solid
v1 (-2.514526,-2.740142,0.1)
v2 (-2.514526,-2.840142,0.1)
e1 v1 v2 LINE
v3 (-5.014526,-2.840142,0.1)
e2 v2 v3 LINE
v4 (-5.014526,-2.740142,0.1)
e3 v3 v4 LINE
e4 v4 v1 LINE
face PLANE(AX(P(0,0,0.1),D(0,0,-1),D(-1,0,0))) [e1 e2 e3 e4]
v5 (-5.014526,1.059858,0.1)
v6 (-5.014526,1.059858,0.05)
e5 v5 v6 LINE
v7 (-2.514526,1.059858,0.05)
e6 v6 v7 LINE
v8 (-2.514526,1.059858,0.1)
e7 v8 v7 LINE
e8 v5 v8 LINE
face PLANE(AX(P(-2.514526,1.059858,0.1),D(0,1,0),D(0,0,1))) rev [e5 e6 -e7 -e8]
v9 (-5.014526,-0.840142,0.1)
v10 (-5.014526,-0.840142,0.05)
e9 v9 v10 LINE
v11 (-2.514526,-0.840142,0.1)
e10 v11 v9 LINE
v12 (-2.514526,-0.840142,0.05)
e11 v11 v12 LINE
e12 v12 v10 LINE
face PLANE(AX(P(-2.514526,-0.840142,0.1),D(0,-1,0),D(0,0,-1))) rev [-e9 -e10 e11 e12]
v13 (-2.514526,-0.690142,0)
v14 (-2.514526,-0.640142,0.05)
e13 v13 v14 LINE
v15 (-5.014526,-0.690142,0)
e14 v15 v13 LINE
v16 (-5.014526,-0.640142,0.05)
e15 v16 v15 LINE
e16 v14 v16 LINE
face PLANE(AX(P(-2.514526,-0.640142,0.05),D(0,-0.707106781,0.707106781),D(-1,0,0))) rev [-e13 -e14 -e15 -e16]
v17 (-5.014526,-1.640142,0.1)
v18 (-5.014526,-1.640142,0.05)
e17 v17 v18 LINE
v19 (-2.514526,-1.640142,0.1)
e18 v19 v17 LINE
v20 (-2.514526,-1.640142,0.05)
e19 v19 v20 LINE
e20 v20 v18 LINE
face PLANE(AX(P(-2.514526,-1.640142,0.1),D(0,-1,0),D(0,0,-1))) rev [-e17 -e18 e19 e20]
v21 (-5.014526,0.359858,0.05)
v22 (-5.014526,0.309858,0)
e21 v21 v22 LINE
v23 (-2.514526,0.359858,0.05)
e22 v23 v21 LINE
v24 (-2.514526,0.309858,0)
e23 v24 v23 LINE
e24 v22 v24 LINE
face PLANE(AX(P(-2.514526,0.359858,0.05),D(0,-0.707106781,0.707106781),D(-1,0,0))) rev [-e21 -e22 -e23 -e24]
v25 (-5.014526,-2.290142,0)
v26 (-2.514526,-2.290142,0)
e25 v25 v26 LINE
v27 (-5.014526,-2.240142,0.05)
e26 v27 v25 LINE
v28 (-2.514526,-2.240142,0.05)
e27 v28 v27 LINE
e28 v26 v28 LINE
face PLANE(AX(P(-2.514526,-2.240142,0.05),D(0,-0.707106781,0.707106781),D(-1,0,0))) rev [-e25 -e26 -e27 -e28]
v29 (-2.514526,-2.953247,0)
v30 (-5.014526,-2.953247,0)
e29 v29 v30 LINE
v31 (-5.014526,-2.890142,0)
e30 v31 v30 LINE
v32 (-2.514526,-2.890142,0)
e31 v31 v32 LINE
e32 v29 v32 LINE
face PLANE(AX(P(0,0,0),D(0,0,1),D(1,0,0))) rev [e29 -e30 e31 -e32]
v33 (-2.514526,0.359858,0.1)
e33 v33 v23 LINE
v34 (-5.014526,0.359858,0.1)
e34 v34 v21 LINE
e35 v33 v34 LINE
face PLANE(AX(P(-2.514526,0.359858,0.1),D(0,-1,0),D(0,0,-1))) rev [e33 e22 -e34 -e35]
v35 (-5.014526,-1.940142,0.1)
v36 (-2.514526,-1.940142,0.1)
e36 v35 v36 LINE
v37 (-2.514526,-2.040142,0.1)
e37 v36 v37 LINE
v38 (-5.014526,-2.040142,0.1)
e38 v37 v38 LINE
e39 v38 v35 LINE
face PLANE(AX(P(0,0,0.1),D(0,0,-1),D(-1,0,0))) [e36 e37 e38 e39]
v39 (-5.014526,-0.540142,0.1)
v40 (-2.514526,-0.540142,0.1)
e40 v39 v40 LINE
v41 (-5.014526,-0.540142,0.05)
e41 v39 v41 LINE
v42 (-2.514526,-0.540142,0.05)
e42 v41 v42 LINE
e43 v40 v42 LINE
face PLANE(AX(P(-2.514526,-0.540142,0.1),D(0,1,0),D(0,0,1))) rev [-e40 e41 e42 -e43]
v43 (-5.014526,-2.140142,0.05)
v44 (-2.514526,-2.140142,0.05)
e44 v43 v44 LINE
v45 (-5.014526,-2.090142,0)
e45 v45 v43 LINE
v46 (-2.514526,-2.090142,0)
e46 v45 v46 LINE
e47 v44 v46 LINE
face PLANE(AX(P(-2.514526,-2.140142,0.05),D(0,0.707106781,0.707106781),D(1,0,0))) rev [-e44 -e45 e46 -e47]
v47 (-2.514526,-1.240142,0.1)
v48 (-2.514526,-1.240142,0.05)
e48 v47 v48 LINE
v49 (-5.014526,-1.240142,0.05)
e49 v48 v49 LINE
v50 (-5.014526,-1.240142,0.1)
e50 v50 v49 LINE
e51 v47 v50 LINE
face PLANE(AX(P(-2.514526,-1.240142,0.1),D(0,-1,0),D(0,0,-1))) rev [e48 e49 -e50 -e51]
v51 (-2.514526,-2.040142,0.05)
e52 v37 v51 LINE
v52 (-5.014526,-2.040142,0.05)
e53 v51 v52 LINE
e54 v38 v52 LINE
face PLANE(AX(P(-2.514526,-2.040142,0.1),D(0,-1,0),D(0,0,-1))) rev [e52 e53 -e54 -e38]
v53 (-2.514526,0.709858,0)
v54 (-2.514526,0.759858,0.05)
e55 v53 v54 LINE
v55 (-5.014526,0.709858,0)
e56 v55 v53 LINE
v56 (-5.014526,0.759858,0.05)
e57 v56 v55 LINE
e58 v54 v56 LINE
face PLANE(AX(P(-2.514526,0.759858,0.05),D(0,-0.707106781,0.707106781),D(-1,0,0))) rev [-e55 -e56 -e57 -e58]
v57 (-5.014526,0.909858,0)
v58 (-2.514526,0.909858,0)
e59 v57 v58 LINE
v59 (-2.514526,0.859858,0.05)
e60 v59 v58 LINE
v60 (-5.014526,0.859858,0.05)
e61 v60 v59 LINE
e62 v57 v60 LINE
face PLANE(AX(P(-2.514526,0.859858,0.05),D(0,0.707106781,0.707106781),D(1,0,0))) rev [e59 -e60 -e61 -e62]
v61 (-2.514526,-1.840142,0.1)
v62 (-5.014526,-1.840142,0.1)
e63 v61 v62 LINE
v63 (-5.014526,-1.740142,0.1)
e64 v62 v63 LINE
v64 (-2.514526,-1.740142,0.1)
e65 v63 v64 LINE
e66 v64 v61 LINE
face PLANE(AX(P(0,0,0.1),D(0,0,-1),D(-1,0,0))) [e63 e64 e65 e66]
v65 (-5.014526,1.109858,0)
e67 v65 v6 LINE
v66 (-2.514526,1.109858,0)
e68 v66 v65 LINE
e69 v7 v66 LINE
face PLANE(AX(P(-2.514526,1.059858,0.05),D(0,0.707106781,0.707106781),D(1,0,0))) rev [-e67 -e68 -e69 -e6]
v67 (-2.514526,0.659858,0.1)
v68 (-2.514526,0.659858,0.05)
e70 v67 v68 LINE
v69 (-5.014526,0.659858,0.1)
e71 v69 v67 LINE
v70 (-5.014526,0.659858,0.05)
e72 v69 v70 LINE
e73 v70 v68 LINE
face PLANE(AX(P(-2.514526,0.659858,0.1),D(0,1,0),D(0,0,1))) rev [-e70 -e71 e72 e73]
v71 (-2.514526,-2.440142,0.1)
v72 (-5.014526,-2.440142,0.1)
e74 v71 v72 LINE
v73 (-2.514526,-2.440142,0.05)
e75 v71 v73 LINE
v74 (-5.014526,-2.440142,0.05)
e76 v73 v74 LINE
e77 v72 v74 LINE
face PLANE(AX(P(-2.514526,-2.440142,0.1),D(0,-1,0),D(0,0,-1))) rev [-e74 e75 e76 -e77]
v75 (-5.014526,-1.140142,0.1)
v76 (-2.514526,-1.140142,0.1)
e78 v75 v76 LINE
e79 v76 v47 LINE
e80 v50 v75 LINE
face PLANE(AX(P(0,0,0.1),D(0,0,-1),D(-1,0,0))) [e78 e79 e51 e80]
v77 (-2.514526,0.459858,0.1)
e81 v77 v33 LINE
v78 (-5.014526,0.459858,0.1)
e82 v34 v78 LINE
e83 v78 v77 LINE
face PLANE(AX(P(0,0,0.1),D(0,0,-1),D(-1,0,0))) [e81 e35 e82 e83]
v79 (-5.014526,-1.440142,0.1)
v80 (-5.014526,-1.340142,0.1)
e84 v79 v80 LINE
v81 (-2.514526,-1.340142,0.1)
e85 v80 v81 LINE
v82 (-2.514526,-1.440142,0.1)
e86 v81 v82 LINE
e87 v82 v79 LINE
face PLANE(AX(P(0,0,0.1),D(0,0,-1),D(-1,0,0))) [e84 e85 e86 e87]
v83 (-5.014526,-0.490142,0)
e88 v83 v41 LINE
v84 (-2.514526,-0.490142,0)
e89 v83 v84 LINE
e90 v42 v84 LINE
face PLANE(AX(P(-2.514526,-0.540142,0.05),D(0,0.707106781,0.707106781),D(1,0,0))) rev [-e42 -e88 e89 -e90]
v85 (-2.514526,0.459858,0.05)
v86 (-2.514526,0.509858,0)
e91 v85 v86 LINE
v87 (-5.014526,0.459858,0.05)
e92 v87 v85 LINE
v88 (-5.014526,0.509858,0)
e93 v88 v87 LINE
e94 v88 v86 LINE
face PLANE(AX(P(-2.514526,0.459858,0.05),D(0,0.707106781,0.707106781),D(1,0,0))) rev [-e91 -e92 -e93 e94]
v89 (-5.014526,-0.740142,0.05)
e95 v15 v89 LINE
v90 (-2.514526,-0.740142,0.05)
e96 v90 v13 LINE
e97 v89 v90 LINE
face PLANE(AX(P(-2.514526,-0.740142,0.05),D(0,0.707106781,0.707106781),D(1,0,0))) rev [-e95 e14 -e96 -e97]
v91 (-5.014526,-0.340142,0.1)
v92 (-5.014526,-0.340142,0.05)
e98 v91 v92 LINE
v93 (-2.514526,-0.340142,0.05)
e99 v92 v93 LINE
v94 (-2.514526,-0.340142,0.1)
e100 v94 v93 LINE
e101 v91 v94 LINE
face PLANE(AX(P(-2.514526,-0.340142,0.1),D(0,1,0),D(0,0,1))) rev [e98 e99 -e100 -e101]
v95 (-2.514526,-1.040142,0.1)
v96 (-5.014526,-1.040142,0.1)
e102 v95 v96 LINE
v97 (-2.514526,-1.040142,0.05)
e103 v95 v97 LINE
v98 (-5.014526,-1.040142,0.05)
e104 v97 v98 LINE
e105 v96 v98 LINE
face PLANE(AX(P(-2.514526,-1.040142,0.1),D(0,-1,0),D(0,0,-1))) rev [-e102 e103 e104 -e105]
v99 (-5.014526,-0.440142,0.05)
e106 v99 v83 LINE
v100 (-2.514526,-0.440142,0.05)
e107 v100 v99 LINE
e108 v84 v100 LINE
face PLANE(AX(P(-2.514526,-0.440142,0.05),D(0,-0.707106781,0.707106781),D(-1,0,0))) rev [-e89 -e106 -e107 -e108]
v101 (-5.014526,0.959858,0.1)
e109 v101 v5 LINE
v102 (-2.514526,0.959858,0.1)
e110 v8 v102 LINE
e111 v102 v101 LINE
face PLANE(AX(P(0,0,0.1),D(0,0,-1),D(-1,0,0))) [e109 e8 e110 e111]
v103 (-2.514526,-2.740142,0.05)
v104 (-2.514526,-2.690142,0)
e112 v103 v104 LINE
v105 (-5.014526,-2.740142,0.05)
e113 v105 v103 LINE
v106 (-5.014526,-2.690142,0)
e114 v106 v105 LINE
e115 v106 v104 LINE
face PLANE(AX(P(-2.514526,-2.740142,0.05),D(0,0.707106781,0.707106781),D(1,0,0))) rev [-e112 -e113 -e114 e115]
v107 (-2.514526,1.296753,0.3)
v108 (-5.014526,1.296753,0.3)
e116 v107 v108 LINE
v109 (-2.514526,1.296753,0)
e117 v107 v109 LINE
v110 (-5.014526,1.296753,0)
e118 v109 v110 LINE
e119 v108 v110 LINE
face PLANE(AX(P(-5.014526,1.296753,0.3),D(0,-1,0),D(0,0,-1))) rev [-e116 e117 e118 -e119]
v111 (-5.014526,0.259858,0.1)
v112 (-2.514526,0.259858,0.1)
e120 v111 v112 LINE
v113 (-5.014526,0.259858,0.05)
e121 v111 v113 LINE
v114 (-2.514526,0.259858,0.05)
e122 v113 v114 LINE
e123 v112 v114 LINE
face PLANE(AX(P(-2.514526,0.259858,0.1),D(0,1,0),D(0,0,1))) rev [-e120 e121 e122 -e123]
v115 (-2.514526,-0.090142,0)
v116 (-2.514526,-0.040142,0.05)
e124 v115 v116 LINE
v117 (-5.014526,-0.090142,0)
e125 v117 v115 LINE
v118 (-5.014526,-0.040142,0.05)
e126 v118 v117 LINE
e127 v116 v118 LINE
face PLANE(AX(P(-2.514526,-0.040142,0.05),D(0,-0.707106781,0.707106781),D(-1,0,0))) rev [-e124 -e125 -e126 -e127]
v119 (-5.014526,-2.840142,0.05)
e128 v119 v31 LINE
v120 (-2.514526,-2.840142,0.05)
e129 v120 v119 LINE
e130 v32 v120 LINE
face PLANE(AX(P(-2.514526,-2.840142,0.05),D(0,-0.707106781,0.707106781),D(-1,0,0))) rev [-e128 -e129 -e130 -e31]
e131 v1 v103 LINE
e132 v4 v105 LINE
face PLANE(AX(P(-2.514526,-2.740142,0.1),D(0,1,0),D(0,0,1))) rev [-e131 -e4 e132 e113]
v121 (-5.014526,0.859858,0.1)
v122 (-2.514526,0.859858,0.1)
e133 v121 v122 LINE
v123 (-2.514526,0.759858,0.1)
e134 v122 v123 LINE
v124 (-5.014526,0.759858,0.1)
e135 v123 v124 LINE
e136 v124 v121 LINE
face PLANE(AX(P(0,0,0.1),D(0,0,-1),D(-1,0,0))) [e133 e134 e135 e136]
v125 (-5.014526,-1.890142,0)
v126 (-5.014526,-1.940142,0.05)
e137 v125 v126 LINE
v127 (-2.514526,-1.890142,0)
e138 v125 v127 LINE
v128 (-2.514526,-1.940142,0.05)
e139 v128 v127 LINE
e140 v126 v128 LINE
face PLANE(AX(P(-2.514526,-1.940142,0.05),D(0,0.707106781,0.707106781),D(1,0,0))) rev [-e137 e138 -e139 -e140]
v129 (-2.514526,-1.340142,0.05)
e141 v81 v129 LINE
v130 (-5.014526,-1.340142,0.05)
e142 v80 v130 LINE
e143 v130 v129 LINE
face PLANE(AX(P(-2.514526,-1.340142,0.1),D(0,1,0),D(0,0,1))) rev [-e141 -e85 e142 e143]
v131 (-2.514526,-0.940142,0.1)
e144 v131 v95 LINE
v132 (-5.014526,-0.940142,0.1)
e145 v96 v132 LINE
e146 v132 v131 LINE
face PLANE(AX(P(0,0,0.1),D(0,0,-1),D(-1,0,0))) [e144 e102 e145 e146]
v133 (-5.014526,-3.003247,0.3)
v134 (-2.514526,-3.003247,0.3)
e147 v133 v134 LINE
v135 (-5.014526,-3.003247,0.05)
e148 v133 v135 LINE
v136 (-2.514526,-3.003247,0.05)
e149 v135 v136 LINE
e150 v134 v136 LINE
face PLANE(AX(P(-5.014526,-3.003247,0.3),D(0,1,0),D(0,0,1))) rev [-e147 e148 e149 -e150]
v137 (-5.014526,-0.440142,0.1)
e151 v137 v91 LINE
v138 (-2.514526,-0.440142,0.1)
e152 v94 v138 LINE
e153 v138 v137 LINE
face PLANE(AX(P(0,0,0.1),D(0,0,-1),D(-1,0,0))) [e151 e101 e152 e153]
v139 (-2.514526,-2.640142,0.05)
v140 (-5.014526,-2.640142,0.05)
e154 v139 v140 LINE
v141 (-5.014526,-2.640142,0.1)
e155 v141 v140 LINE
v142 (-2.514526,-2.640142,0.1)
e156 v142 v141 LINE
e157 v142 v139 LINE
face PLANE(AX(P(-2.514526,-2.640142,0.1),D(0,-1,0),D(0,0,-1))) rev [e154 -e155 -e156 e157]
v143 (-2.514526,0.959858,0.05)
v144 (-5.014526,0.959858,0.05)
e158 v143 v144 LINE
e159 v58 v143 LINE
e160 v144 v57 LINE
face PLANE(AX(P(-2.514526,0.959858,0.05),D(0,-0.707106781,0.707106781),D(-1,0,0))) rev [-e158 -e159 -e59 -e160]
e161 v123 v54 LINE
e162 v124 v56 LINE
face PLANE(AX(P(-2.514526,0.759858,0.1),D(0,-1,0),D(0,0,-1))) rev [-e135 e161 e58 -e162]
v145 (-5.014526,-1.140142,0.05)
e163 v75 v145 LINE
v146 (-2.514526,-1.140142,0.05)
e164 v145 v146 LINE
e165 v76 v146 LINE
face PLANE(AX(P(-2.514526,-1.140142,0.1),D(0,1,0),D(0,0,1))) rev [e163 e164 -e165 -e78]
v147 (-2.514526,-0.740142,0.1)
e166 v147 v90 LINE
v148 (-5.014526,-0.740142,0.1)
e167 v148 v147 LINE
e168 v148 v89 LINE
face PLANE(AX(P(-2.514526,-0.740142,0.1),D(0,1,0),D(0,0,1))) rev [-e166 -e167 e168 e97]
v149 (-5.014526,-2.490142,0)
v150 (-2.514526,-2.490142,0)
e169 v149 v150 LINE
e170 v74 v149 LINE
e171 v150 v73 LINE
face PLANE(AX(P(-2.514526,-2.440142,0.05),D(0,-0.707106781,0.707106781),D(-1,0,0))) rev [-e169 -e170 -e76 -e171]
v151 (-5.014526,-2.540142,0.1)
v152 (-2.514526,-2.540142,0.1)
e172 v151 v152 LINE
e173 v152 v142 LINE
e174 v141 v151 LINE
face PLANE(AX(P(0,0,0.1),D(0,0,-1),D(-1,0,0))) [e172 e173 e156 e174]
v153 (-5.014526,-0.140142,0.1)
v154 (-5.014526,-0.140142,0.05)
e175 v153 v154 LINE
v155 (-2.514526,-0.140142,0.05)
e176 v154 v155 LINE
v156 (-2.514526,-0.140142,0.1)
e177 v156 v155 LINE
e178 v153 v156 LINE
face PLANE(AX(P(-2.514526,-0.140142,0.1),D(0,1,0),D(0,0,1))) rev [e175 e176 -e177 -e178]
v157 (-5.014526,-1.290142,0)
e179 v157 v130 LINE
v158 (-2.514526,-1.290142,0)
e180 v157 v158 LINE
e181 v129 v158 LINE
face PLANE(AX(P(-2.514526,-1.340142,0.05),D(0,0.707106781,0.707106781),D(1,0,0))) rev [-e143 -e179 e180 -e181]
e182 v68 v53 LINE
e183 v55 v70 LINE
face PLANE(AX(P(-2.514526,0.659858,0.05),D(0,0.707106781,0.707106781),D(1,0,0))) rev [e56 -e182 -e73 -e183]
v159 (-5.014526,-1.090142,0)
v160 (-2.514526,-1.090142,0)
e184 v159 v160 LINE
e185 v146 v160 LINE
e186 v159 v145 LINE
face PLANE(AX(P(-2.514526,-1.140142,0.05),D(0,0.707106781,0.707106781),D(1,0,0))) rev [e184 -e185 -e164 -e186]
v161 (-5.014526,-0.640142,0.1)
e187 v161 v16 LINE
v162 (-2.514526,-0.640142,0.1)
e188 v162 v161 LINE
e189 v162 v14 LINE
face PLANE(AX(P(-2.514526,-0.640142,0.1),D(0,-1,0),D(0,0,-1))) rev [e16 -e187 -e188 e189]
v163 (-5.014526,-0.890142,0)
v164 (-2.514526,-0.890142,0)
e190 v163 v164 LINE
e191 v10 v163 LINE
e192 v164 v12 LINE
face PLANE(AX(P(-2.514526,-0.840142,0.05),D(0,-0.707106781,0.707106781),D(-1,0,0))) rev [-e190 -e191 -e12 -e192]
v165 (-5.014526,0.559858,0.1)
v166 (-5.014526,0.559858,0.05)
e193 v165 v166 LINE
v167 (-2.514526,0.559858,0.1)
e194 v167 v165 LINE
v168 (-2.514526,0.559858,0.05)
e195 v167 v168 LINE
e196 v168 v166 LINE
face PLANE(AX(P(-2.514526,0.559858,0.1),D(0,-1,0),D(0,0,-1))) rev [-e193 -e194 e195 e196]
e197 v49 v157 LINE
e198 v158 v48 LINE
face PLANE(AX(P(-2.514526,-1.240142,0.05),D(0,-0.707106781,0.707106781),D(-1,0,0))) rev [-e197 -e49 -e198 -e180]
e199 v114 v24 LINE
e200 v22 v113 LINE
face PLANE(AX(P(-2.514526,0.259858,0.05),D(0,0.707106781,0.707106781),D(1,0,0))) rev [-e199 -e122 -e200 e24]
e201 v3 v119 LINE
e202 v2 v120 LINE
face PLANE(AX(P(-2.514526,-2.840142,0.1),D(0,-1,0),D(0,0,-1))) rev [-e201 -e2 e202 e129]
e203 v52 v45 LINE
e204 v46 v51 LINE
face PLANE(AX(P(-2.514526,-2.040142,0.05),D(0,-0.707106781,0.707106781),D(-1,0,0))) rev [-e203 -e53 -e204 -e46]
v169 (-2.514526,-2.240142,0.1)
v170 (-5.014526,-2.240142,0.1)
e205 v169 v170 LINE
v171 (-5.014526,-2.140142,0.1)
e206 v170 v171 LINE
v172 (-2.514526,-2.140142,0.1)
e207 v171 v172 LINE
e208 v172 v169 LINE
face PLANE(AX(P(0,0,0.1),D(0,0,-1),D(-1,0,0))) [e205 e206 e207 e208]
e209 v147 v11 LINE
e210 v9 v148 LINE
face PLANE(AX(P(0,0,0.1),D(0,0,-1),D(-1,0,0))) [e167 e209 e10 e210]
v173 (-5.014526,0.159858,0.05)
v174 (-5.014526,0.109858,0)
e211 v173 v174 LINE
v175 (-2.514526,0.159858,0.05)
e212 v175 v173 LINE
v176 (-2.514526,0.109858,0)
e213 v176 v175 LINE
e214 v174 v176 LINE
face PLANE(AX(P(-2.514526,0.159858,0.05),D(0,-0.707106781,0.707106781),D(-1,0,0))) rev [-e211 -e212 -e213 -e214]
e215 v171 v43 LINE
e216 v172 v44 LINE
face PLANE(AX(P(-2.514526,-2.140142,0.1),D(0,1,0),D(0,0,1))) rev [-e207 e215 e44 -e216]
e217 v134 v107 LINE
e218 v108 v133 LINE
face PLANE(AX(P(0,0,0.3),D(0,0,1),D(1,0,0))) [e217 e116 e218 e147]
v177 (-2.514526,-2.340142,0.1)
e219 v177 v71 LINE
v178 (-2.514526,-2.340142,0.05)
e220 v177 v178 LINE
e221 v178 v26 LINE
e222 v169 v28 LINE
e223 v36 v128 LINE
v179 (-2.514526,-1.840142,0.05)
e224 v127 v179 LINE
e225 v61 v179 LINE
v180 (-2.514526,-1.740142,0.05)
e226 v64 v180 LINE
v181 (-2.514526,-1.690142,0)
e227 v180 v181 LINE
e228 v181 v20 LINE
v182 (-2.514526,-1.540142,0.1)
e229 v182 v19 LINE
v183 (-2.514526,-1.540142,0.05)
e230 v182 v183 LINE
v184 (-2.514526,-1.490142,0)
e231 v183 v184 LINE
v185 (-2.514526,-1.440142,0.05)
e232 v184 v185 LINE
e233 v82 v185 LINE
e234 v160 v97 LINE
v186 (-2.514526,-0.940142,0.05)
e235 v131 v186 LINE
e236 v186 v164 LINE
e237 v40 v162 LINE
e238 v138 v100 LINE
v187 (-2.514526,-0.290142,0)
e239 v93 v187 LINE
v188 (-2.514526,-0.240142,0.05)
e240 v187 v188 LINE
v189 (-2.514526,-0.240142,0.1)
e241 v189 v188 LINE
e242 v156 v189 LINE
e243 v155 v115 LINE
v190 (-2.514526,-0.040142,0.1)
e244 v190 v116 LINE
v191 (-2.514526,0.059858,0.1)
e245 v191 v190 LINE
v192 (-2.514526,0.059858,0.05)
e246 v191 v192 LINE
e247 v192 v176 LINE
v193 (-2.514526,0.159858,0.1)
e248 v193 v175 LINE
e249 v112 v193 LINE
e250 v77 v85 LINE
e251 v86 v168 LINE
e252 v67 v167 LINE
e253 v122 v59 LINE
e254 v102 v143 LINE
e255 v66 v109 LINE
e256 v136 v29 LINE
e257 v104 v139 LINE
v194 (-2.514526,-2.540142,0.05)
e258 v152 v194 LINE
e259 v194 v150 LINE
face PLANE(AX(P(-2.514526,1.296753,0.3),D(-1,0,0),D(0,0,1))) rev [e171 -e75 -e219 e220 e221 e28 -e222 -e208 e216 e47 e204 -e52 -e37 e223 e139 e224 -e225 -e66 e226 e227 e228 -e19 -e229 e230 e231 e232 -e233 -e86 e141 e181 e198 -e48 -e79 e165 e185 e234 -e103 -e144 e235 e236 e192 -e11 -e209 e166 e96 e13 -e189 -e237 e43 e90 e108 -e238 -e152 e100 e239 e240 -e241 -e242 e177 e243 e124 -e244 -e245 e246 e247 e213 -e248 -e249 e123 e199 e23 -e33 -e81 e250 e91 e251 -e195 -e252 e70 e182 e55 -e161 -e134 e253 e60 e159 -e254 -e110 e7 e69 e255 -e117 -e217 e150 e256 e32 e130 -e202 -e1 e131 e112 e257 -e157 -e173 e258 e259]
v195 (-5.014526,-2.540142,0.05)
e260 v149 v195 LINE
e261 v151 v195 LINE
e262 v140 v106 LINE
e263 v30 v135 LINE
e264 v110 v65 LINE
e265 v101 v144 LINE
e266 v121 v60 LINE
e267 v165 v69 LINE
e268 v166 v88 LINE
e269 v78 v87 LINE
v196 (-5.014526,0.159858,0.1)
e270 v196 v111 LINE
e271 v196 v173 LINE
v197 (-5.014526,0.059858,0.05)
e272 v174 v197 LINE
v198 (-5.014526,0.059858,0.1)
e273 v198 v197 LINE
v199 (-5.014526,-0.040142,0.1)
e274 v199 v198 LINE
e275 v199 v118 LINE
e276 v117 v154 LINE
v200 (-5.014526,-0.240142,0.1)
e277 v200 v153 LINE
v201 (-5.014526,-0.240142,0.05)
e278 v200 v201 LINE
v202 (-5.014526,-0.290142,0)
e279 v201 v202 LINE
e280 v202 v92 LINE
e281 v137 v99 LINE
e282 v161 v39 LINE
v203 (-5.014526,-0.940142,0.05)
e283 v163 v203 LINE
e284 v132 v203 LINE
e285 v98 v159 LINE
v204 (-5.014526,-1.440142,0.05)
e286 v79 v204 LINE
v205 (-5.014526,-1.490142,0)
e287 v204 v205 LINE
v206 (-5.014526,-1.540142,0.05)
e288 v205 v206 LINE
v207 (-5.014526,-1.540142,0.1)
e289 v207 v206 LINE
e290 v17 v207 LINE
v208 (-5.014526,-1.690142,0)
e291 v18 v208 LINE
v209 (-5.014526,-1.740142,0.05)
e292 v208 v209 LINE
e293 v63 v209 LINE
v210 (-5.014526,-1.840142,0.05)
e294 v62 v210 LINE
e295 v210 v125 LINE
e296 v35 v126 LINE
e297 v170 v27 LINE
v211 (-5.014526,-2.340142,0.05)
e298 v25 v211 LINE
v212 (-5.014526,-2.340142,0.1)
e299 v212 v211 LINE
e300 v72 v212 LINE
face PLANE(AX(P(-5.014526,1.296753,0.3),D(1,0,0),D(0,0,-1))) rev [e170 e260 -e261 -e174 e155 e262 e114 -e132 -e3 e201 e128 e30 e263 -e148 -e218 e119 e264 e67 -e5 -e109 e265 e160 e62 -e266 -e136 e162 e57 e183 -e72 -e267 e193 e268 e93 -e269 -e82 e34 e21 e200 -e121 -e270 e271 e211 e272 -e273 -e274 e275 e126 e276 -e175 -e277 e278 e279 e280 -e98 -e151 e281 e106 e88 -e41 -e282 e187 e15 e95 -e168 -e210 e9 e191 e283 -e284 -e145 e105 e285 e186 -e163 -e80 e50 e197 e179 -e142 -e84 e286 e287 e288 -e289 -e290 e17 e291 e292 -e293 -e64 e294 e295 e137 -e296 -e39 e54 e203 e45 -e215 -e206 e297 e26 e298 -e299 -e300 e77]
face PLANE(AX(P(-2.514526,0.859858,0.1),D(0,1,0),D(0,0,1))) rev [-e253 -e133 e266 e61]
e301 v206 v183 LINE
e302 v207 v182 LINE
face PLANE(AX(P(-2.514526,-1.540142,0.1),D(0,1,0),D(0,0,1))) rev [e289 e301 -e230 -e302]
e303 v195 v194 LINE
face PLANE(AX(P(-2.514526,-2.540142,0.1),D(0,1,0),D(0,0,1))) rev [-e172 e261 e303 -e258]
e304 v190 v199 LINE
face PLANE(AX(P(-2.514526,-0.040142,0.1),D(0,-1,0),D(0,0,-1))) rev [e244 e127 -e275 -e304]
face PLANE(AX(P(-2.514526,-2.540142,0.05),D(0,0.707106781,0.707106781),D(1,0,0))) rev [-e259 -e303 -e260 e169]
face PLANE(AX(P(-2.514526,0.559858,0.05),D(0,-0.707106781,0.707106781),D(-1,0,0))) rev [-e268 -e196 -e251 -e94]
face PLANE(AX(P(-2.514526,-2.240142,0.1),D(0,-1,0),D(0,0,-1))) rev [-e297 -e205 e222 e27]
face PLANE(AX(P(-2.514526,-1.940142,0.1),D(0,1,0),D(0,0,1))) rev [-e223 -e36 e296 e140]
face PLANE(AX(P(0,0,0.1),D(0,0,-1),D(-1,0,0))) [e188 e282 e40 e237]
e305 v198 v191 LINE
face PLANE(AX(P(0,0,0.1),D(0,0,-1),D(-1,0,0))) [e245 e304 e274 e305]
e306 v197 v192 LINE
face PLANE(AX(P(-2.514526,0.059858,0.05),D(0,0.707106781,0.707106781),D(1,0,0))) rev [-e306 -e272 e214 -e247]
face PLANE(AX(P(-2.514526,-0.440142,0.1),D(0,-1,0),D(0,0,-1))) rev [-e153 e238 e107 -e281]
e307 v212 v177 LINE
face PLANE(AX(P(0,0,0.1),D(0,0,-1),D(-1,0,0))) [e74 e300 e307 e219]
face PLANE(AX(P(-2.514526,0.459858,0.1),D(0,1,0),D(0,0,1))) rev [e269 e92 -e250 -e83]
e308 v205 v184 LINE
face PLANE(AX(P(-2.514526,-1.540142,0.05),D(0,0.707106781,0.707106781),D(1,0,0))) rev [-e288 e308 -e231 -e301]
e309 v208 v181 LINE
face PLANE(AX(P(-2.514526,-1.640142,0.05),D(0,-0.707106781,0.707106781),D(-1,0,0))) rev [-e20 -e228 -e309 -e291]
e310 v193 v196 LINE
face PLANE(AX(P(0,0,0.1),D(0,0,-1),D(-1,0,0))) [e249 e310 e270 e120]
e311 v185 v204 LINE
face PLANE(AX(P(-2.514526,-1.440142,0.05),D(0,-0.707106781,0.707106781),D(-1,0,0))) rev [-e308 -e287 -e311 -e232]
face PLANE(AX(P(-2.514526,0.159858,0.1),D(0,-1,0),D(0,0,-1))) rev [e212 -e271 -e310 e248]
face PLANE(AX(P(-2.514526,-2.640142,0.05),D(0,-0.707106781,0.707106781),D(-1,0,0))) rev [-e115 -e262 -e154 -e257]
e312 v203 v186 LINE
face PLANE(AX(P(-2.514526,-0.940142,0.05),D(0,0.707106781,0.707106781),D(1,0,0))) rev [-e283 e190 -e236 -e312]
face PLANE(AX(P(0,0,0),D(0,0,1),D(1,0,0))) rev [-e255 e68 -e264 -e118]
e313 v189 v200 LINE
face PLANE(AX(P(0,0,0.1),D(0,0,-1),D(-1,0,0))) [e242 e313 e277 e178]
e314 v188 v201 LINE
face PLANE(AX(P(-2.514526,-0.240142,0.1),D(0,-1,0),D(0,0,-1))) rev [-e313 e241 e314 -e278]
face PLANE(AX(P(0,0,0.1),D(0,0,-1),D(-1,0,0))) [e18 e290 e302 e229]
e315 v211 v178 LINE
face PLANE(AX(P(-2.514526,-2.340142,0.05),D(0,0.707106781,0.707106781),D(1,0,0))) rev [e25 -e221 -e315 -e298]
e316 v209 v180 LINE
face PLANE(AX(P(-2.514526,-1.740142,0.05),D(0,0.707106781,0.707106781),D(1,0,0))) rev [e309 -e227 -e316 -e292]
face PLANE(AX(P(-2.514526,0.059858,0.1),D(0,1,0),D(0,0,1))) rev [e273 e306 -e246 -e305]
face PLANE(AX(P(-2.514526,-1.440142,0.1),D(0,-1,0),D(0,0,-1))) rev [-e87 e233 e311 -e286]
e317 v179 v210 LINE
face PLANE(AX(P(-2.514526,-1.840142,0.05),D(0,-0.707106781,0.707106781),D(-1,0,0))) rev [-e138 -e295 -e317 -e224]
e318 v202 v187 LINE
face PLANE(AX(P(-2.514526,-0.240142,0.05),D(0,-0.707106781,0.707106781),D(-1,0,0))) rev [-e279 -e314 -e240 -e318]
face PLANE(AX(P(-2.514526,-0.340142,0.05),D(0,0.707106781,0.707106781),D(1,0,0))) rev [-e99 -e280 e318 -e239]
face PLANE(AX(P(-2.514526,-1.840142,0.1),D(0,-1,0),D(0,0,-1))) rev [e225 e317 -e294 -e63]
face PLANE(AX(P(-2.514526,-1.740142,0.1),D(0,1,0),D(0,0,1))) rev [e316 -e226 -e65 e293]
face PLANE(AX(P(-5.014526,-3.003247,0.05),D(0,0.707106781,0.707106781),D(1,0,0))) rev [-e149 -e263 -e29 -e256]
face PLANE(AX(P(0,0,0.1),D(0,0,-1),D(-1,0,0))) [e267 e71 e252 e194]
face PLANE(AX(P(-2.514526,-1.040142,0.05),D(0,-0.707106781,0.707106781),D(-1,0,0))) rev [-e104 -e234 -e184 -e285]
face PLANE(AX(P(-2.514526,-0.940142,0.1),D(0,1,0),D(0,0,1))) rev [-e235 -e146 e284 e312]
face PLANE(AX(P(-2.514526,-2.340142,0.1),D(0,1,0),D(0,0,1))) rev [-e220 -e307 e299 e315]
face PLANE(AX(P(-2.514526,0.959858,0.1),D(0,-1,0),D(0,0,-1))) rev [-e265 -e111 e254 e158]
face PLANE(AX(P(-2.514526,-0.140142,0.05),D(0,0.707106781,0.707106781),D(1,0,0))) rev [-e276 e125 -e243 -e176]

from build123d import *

# Parameters (mm, degrees)
ESBO_O1_W                = 2.5
ESBO_O1_H                = 4.3
RESSALTO_EXTRUS_O1_DEPTH = 0.3
ESBO_O2_W                = 2.5
ESBO_O2_H                = 0.1
CORTE_EXTRUS_O1_DEPTH    = 0.1
CHANFRO1_SIZE            = 0.05


with BuildPart() as part:
    # Esboço1 → Ressalto-extrusão1 (new body)
    with BuildSketch(Plane.XY):
        with Locations((-3.764526375, -0.853246753)):
            Rectangle(ESBO_O1_W, ESBO_O1_H)
    extrude(amount=RESSALTO_EXTRUS_O1_DEPTH)

    # Esboço2 → Corte-extrusão1 (cut)
    with BuildSketch(Plane(origin=(0, 0, 0), x_dir=(-1, 0, 0), z_dir=(0, 0, -1))):
        with Locations((3.764526375, 0.809857643)):
            Rectangle(ESBO_O2_W, ESBO_O2_H)
        with Locations((3.764526375, 1.009857643)):
            Rectangle(ESBO_O2_W, ESBO_O2_H)
        with Locations((3.764526375, 0.609857643)):
            Rectangle(ESBO_O2_W, ESBO_O2_H)
        with Locations((3.764526375, 0.409857643)):
            Rectangle(ESBO_O2_W, ESBO_O2_H)
        with Locations((3.764526375, 0.209857643)):
            Rectangle(ESBO_O2_W, ESBO_O2_H)
        with Locations((3.764526375, 0.009857643)):
            Rectangle(ESBO_O2_W, ESBO_O2_H)
        with Locations((3.764526375, -0.190142357)):
            Rectangle(ESBO_O2_W, ESBO_O2_H)
        with Locations((3.764526375, -0.390142357)):
            Rectangle(ESBO_O2_W, ESBO_O2_H)
        with Locations((3.764526375, -0.590142357)):
            Rectangle(ESBO_O2_W, ESBO_O2_H)
        with Locations((3.764526375, -0.790142357)):
            Rectangle(ESBO_O2_W, ESBO_O2_H)
        with Locations((3.764526375, -0.990142357)):
            Rectangle(ESBO_O2_W, ESBO_O2_H)
        with Locations((3.764526375, -1.190142357)):
            Rectangle(ESBO_O2_W, ESBO_O2_H)
        with Locations((3.764526375, -1.390142357)):
            Rectangle(ESBO_O2_W, ESBO_O2_H)
        with Locations((3.764526375, -1.590142357)):
            Rectangle(ESBO_O2_W, ESBO_O2_H)
        with Locations((3.764526375, -1.790142357)):
            Rectangle(ESBO_O2_W, ESBO_O2_H)
        with Locations((3.764526375, -1.990142357)):
            Rectangle(ESBO_O2_W, ESBO_O2_H)
        with Locations((3.764526375, -2.190142357)):
            Rectangle(ESBO_O2_W, ESBO_O2_H)
        with Locations((3.764526375, -2.390142357)):
            Rectangle(ESBO_O2_W, ESBO_O2_H)
        with Locations((3.764526375, -2.590142357)):
            Rectangle(ESBO_O2_W, ESBO_O2_H)
        with Locations((3.764526375, -2.790142357)):
            Rectangle(ESBO_O2_W, ESBO_O2_H)
    extrude(amount=-CORTE_EXTRUS_O1_DEPTH, mode=Mode.SUBTRACT)

    # Chanfro1
    # the kernel refuses this chamfer: 0.05 mm, written as the material it takes off along each edge
    with BuildSketch(Plane(origin=(-5.143110525, -0.240142357, 0), x_dir=(0, -0.9996219169112968, -0.027495876610586355), z_dir=(1, 0, 0)), Plane(origin=(-5.143110525, -0.440142357, 0), x_dir=(0, -0.9996219169112968, -0.027495876610586386), z_dir=(1, 0, 0)), Plane(origin=(-5.143110525, -0.640142357, 0), x_dir=(0, -0.9996219169112968, -0.027495876610586313), z_dir=(1, 0, 0)), Plane(origin=(-5.143110525, -0.840142357, 0), x_dir=(0, -0.9996219169112968, -0.027495876610586313), z_dir=(1, 0, 0)), Plane(origin=(-5.143110525, -1.040142357, 0), x_dir=(0, -0.9996219169112968, -0.027495876610586313), z_dir=(1, 0, 0)), Plane(origin=(-5.143110525, -1.240142357, 0), x_dir=(0, -0.9996219169112968, -0.027495876610586313), z_dir=(1, 0, 0)), Plane(origin=(-5.143110525, -1.440142357, 0), x_dir=(0, -0.9996219169112968, -0.027495876610586313), z_dir=(1, 0, 0)), Plane(origin=(-5.143110525, -1.640142357, 0), x_dir=(0, -0.9996219169112968, -0.027495876610586313), z_dir=(1, 0, 0)), Plane(origin=(-5.143110525, 0.959857643, 0), x_dir=(0, -0.9996219169112968, -0.027495876610586344), z_dir=(1, 0, 0)), Plane(origin=(-2.385942226, 1.059857643, 0), x_dir=(0, 0.9996219169112968, -0.027495876610586313), z_dir=(-1, 0, 0)), Plane(origin=(-5.143110525, -1.840142357, 0), x_dir=(0, -0.9996219169112968, -0.027495876610586313), z_dir=(1, 0, 0)), Plane(origin=(-5.143110525, -2.040142357, 0), x_dir=(0, -0.9996219169112966, -0.027495876610586487), z_dir=(1, 0, 0)), Plane(origin=(-5.143110525, -2.240142357, 0), x_dir=(0, -0.9996219169112966, -0.027495876610586487), z_dir=(1, 0, 0)), Plane(origin=(-5.143110525, -2.440142357, 0), x_dir=(0, -0.9996219169112966, -0.027495876610586487), z_dir=(1, 0, 0)), Plane(origin=(-5.143110525, -2.640142357, 0), x_dir=(0, -0.9996219169112966, -0.027495876610586487), z_dir=(1, 0, 0)), Plane(origin=(-5.143110525, -2.840142357, 0), x_dir=(0, -0.9996219169112966, -0.027495876610586487), z_dir=(1, 0, 0)), Plane(origin=(-5.143110525, 0.759857643, 0), x_dir=(0, -0.9996219169112968, -0.02749587661058628), z_dir=(1, 0, 0)), Plane(origin=(-5.143110525, 0.559857643, 0), x_dir=(0, -0.9996219169112968, -0.027495876610586313), z_dir=(1, 0, 0)), Plane(origin=(-2.385942226, -3.003246753, 0), x_dir=(0, 0.9996219169112966, -0.027495876610586487), z_dir=(-1, 0, 0)), Plane(origin=(-5.143110525, 0.359857643, 0), x_dir=(0, -0.9996219169112968, -0.027495876610586355), z_dir=(1, 0, 0)), Plane(origin=(-5.143110525, 0.159857643, 0), x_dir=(0, -0.9996219169112968, -0.027495876610586303), z_dir=(1, 0, 0)), Plane(origin=(-5.143110525, -0.040142357, 0), x_dir=(0, -0.9996219169112968, -0.02749587661058635), z_dir=(1, 0, 0))) as chanfro1_piece_1:
        Polygon((CHANFRO1_SIZE * 0.999621916911, -CHANFRO1_SIZE * 0.0274958766106), (-CHANFRO1_SIZE * 0.0274958766106, -CHANFRO1_SIZE * 0.999621916911), (0, 0), align=None)
    extrude(amount=2.757168299, mode=Mode.SUBTRACT)
    with BuildSketch(Plane(origin=(-2.385942226, -0.140142357, 0), x_dir=(0, -0.027495876610586275, 0.9996219169112968), z_dir=(-1, 0, 0)), Plane(origin=(-2.385942226, -0.340142357, 0), x_dir=(0, -0.027495876610586275, 0.9996219169112968), z_dir=(-1, 0, 0)), Plane(origin=(-2.385942226, -0.540142357, 0), x_dir=(0, -0.02749587661058735, 0.9996219169112966), z_dir=(-1, 0, 0)), Plane(origin=(-2.385942226, -0.740142357, 0), x_dir=(0, -0.02749587661058735, 0.9996219169112966), z_dir=(-1, 0, 0)), Plane(origin=(-2.385942226, -0.940142357, 0), x_dir=(0, -0.02749587661058735, 0.9996219169112966), z_dir=(-1, 0, 0)), Plane(origin=(-2.385942226, -1.140142357, 0), x_dir=(0, -0.02749587661058735, 0.9996219169112966), z_dir=(-1, 0, 0)), Plane(origin=(-2.385942226, -1.340142357, 0), x_dir=(0, -0.02749587661058735, 0.9996219169112966), z_dir=(-1, 0, 0)), Plane(origin=(-2.385942226, -1.540142357, 0), x_dir=(0, -0.02749587661058735, 0.9996219169112966), z_dir=(-1, 0, 0)), Plane(origin=(-2.385942226, -1.740142357, 0), x_dir=(0, -0.02749587661058735, 0.9996219169112966), z_dir=(-1, 0, 0)), Plane(origin=(-2.385942226, -1.940142357, 0), x_dir=(0, -0.02749587661058735, 0.9996219169112966), z_dir=(-1, 0, 0)), Plane(origin=(-2.385942226, -2.140142357, 0), x_dir=(0, -0.02749587661058735, 0.9996219169112966), z_dir=(-1, 0, 0)), Plane(origin=(-2.385942226, -2.340142357, 0), x_dir=(0, -0.02749587661058735, 0.9996219169112966), z_dir=(-1, 0, 0)), Plane(origin=(-2.385942226, -2.540142357, 0), x_dir=(0, -0.02749587661058735, 0.9996219169112966), z_dir=(-1, 0, 0)), Plane(origin=(-2.385942226, -2.740142357, 0), x_dir=(0, -0.02749587661058735, 0.9996219169112966), z_dir=(-1, 0, 0)), Plane(origin=(-2.385942226, 0.859857643, 0), x_dir=(0, -0.02749587661058735, 0.9996219169112966), z_dir=(-1, 0, 0)), Plane(origin=(-2.385942226, 0.659857643, 0), x_dir=(0, -0.027495876610587354, 0.9996219169112966), z_dir=(-1, 0, 0)), Plane(origin=(-2.385942226, 0.459857643, 0), x_dir=(0, -0.027495876610586275, 0.9996219169112968), z_dir=(-1, 0, 0)), Plane(origin=(-2.385942226, 0.259857643, 0), x_dir=(0, -0.027495876610586275, 0.9996219169112968), z_dir=(-1, 0, 0)), Plane(origin=(-2.385942226, 0.059857643, 0), x_dir=(0, -0.027495876610586407, 0.9996219169112968), z_dir=(-1, 0, 0))) as chanfro1_piece_2:
        Polygon((CHANFRO1_SIZE * 0.999621916911, CHANFRO1_SIZE * 0.0274958766106), (-CHANFRO1_SIZE * 0.0274958766106, CHANFRO1_SIZE * 0.999621916911), (0, 0), align=None)
    extrude(amount=2.757168299, mode=Mode.SUBTRACT)


solid = part.part
